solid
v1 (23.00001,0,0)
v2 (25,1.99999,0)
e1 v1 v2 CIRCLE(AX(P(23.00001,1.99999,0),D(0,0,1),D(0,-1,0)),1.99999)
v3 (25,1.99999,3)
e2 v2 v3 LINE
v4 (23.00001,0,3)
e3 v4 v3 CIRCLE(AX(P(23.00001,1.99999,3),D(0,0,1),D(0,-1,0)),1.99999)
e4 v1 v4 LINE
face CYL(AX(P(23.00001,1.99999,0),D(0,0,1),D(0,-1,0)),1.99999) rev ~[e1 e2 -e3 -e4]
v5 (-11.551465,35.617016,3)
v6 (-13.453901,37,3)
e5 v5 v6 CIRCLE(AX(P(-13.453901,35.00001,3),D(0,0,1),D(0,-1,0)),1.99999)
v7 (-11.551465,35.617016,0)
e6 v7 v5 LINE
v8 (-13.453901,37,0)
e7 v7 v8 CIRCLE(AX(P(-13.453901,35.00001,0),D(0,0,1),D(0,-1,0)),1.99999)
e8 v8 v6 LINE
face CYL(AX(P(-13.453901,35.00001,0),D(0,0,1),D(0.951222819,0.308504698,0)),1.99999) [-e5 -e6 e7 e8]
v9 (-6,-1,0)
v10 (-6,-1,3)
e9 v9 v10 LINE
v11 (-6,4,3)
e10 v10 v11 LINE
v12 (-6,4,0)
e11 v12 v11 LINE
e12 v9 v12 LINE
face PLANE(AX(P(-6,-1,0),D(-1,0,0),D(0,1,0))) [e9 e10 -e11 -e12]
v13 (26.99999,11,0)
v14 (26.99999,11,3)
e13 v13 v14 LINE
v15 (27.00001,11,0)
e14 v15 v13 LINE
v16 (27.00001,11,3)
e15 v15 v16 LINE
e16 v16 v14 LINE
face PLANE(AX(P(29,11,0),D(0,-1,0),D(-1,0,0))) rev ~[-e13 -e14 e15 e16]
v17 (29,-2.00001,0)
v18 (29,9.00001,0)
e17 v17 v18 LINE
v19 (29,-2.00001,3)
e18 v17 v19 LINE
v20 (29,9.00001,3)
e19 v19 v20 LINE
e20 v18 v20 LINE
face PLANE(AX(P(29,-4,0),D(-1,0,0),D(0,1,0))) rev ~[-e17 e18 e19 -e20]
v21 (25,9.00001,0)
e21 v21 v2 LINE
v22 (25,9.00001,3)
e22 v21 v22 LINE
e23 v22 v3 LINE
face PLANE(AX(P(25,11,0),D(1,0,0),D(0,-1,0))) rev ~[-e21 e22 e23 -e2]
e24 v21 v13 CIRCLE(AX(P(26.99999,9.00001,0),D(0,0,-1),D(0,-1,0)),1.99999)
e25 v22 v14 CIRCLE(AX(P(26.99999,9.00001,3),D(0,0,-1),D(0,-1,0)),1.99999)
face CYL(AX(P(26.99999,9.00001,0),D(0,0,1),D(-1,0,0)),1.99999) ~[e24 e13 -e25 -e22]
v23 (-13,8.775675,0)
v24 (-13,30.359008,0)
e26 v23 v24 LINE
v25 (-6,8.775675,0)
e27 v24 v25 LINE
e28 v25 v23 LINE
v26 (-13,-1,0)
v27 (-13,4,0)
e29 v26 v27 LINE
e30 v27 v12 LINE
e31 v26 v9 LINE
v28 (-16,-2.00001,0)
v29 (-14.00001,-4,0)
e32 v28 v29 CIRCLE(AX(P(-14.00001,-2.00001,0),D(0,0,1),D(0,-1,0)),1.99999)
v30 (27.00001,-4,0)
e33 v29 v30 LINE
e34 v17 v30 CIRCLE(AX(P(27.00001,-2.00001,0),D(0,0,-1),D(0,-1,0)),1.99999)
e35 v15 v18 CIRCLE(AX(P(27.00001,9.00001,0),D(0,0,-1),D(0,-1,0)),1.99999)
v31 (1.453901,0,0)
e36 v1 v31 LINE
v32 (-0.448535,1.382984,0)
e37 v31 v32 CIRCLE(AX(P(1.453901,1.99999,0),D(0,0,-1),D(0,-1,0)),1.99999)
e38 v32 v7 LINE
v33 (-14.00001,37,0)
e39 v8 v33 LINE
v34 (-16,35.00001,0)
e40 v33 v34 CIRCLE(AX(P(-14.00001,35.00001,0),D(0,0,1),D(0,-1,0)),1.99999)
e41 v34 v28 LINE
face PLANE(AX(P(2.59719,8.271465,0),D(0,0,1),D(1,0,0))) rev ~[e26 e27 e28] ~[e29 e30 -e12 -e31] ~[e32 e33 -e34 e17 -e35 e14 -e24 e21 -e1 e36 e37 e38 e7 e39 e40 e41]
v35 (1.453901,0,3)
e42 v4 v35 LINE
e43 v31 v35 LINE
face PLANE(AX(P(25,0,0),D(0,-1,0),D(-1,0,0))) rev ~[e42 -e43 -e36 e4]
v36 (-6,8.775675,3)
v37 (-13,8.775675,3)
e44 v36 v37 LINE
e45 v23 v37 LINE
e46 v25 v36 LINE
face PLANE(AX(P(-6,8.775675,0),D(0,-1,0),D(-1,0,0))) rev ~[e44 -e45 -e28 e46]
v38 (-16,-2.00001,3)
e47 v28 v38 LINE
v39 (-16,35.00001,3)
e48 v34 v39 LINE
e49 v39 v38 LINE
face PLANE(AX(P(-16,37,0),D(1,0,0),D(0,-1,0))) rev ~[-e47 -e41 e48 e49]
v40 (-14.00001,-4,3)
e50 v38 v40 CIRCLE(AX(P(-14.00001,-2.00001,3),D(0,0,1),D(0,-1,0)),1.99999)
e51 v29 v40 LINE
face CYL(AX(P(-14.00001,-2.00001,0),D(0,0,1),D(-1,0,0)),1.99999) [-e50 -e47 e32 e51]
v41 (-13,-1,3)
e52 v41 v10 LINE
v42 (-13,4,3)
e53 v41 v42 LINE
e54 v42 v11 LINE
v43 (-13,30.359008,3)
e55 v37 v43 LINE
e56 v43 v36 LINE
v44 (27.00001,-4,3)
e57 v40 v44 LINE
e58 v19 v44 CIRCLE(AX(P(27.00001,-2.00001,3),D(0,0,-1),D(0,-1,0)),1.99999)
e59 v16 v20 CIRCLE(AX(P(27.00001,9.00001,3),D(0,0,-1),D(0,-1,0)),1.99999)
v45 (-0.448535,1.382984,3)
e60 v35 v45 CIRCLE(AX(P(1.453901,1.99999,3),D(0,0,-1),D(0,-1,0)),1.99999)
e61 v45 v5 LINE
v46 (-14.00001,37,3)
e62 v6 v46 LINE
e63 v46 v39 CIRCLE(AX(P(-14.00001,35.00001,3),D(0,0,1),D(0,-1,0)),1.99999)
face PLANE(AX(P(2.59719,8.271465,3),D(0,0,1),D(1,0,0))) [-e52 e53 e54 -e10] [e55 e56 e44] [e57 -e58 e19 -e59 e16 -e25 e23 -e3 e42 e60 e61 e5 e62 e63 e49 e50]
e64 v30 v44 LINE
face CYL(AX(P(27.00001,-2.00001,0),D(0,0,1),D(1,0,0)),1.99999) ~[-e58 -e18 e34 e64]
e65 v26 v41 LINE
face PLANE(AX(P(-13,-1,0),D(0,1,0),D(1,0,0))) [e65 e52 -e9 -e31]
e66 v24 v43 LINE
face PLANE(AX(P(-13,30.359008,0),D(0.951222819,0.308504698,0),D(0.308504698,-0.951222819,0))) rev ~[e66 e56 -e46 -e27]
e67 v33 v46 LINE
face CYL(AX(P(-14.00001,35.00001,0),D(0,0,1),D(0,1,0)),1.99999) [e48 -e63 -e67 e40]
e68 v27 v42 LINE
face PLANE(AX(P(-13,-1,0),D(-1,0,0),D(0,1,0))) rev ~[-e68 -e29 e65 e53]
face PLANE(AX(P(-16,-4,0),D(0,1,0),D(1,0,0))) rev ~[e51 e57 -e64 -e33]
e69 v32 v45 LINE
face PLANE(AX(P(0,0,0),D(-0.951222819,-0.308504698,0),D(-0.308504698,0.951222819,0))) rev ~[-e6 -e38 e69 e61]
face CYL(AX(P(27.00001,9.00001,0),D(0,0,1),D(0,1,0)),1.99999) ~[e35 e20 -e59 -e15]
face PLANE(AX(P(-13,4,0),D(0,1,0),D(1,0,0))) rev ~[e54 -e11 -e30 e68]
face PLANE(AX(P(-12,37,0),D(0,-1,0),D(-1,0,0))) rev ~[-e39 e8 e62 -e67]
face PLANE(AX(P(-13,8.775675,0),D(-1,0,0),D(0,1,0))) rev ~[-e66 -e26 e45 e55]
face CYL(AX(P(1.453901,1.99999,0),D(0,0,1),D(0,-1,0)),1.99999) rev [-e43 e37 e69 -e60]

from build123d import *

# Parameters (mm, degrees)
F0_W     = 7
F0_H     = 5
F1_DEPTH = 3
F2_R     = 1.99999


# Not quite as in the source:
# - a fillet or chamfer is up to 0.001 mm smaller than in the source, because OpenCascade refuses the exact size
# - a feature names something its author has since deleted; it is built from what else it names


with BuildPart() as f1:
    # F0 (on Top) → F1 (new body)
    with BuildSketch(Plane.XY):
        Polygon((25, 0), (0, 0), (-12, 37), (-16, 37), (-16, -4), (29, -4), (29, 11), (25, 11), align=None)
        with Locations((-9.5, 1.5)):
            Rectangle(F0_W, F0_H, mode=Mode.SUBTRACT)
        Polygon((-13, 8.7756748306), (-13, 30.3590081639), (-6, 8.7756748306), align=None, mode=Mode.SUBTRACT)
    extrude(amount=F1_DEPTH)

    # F2 (radius 2 in the source; OpenCascade refuses exactly that, so slightly less here)
    f2_edges = [f1.edges().sort_by_distance(p)[0] for p in [
        (-16, -4, 1.5),
        (25, 0, 1.5),
        (-12, 37, 1.5),
        (29, 11, 1.5),
        (0, 0, 1.5),
        (-16, 37, 1.5),
        (29, -4, 1.5),
        (25, 11, 1.5),
    ]]
    fillet(f2_edges, radius=F2_R)


solid = f1.part
